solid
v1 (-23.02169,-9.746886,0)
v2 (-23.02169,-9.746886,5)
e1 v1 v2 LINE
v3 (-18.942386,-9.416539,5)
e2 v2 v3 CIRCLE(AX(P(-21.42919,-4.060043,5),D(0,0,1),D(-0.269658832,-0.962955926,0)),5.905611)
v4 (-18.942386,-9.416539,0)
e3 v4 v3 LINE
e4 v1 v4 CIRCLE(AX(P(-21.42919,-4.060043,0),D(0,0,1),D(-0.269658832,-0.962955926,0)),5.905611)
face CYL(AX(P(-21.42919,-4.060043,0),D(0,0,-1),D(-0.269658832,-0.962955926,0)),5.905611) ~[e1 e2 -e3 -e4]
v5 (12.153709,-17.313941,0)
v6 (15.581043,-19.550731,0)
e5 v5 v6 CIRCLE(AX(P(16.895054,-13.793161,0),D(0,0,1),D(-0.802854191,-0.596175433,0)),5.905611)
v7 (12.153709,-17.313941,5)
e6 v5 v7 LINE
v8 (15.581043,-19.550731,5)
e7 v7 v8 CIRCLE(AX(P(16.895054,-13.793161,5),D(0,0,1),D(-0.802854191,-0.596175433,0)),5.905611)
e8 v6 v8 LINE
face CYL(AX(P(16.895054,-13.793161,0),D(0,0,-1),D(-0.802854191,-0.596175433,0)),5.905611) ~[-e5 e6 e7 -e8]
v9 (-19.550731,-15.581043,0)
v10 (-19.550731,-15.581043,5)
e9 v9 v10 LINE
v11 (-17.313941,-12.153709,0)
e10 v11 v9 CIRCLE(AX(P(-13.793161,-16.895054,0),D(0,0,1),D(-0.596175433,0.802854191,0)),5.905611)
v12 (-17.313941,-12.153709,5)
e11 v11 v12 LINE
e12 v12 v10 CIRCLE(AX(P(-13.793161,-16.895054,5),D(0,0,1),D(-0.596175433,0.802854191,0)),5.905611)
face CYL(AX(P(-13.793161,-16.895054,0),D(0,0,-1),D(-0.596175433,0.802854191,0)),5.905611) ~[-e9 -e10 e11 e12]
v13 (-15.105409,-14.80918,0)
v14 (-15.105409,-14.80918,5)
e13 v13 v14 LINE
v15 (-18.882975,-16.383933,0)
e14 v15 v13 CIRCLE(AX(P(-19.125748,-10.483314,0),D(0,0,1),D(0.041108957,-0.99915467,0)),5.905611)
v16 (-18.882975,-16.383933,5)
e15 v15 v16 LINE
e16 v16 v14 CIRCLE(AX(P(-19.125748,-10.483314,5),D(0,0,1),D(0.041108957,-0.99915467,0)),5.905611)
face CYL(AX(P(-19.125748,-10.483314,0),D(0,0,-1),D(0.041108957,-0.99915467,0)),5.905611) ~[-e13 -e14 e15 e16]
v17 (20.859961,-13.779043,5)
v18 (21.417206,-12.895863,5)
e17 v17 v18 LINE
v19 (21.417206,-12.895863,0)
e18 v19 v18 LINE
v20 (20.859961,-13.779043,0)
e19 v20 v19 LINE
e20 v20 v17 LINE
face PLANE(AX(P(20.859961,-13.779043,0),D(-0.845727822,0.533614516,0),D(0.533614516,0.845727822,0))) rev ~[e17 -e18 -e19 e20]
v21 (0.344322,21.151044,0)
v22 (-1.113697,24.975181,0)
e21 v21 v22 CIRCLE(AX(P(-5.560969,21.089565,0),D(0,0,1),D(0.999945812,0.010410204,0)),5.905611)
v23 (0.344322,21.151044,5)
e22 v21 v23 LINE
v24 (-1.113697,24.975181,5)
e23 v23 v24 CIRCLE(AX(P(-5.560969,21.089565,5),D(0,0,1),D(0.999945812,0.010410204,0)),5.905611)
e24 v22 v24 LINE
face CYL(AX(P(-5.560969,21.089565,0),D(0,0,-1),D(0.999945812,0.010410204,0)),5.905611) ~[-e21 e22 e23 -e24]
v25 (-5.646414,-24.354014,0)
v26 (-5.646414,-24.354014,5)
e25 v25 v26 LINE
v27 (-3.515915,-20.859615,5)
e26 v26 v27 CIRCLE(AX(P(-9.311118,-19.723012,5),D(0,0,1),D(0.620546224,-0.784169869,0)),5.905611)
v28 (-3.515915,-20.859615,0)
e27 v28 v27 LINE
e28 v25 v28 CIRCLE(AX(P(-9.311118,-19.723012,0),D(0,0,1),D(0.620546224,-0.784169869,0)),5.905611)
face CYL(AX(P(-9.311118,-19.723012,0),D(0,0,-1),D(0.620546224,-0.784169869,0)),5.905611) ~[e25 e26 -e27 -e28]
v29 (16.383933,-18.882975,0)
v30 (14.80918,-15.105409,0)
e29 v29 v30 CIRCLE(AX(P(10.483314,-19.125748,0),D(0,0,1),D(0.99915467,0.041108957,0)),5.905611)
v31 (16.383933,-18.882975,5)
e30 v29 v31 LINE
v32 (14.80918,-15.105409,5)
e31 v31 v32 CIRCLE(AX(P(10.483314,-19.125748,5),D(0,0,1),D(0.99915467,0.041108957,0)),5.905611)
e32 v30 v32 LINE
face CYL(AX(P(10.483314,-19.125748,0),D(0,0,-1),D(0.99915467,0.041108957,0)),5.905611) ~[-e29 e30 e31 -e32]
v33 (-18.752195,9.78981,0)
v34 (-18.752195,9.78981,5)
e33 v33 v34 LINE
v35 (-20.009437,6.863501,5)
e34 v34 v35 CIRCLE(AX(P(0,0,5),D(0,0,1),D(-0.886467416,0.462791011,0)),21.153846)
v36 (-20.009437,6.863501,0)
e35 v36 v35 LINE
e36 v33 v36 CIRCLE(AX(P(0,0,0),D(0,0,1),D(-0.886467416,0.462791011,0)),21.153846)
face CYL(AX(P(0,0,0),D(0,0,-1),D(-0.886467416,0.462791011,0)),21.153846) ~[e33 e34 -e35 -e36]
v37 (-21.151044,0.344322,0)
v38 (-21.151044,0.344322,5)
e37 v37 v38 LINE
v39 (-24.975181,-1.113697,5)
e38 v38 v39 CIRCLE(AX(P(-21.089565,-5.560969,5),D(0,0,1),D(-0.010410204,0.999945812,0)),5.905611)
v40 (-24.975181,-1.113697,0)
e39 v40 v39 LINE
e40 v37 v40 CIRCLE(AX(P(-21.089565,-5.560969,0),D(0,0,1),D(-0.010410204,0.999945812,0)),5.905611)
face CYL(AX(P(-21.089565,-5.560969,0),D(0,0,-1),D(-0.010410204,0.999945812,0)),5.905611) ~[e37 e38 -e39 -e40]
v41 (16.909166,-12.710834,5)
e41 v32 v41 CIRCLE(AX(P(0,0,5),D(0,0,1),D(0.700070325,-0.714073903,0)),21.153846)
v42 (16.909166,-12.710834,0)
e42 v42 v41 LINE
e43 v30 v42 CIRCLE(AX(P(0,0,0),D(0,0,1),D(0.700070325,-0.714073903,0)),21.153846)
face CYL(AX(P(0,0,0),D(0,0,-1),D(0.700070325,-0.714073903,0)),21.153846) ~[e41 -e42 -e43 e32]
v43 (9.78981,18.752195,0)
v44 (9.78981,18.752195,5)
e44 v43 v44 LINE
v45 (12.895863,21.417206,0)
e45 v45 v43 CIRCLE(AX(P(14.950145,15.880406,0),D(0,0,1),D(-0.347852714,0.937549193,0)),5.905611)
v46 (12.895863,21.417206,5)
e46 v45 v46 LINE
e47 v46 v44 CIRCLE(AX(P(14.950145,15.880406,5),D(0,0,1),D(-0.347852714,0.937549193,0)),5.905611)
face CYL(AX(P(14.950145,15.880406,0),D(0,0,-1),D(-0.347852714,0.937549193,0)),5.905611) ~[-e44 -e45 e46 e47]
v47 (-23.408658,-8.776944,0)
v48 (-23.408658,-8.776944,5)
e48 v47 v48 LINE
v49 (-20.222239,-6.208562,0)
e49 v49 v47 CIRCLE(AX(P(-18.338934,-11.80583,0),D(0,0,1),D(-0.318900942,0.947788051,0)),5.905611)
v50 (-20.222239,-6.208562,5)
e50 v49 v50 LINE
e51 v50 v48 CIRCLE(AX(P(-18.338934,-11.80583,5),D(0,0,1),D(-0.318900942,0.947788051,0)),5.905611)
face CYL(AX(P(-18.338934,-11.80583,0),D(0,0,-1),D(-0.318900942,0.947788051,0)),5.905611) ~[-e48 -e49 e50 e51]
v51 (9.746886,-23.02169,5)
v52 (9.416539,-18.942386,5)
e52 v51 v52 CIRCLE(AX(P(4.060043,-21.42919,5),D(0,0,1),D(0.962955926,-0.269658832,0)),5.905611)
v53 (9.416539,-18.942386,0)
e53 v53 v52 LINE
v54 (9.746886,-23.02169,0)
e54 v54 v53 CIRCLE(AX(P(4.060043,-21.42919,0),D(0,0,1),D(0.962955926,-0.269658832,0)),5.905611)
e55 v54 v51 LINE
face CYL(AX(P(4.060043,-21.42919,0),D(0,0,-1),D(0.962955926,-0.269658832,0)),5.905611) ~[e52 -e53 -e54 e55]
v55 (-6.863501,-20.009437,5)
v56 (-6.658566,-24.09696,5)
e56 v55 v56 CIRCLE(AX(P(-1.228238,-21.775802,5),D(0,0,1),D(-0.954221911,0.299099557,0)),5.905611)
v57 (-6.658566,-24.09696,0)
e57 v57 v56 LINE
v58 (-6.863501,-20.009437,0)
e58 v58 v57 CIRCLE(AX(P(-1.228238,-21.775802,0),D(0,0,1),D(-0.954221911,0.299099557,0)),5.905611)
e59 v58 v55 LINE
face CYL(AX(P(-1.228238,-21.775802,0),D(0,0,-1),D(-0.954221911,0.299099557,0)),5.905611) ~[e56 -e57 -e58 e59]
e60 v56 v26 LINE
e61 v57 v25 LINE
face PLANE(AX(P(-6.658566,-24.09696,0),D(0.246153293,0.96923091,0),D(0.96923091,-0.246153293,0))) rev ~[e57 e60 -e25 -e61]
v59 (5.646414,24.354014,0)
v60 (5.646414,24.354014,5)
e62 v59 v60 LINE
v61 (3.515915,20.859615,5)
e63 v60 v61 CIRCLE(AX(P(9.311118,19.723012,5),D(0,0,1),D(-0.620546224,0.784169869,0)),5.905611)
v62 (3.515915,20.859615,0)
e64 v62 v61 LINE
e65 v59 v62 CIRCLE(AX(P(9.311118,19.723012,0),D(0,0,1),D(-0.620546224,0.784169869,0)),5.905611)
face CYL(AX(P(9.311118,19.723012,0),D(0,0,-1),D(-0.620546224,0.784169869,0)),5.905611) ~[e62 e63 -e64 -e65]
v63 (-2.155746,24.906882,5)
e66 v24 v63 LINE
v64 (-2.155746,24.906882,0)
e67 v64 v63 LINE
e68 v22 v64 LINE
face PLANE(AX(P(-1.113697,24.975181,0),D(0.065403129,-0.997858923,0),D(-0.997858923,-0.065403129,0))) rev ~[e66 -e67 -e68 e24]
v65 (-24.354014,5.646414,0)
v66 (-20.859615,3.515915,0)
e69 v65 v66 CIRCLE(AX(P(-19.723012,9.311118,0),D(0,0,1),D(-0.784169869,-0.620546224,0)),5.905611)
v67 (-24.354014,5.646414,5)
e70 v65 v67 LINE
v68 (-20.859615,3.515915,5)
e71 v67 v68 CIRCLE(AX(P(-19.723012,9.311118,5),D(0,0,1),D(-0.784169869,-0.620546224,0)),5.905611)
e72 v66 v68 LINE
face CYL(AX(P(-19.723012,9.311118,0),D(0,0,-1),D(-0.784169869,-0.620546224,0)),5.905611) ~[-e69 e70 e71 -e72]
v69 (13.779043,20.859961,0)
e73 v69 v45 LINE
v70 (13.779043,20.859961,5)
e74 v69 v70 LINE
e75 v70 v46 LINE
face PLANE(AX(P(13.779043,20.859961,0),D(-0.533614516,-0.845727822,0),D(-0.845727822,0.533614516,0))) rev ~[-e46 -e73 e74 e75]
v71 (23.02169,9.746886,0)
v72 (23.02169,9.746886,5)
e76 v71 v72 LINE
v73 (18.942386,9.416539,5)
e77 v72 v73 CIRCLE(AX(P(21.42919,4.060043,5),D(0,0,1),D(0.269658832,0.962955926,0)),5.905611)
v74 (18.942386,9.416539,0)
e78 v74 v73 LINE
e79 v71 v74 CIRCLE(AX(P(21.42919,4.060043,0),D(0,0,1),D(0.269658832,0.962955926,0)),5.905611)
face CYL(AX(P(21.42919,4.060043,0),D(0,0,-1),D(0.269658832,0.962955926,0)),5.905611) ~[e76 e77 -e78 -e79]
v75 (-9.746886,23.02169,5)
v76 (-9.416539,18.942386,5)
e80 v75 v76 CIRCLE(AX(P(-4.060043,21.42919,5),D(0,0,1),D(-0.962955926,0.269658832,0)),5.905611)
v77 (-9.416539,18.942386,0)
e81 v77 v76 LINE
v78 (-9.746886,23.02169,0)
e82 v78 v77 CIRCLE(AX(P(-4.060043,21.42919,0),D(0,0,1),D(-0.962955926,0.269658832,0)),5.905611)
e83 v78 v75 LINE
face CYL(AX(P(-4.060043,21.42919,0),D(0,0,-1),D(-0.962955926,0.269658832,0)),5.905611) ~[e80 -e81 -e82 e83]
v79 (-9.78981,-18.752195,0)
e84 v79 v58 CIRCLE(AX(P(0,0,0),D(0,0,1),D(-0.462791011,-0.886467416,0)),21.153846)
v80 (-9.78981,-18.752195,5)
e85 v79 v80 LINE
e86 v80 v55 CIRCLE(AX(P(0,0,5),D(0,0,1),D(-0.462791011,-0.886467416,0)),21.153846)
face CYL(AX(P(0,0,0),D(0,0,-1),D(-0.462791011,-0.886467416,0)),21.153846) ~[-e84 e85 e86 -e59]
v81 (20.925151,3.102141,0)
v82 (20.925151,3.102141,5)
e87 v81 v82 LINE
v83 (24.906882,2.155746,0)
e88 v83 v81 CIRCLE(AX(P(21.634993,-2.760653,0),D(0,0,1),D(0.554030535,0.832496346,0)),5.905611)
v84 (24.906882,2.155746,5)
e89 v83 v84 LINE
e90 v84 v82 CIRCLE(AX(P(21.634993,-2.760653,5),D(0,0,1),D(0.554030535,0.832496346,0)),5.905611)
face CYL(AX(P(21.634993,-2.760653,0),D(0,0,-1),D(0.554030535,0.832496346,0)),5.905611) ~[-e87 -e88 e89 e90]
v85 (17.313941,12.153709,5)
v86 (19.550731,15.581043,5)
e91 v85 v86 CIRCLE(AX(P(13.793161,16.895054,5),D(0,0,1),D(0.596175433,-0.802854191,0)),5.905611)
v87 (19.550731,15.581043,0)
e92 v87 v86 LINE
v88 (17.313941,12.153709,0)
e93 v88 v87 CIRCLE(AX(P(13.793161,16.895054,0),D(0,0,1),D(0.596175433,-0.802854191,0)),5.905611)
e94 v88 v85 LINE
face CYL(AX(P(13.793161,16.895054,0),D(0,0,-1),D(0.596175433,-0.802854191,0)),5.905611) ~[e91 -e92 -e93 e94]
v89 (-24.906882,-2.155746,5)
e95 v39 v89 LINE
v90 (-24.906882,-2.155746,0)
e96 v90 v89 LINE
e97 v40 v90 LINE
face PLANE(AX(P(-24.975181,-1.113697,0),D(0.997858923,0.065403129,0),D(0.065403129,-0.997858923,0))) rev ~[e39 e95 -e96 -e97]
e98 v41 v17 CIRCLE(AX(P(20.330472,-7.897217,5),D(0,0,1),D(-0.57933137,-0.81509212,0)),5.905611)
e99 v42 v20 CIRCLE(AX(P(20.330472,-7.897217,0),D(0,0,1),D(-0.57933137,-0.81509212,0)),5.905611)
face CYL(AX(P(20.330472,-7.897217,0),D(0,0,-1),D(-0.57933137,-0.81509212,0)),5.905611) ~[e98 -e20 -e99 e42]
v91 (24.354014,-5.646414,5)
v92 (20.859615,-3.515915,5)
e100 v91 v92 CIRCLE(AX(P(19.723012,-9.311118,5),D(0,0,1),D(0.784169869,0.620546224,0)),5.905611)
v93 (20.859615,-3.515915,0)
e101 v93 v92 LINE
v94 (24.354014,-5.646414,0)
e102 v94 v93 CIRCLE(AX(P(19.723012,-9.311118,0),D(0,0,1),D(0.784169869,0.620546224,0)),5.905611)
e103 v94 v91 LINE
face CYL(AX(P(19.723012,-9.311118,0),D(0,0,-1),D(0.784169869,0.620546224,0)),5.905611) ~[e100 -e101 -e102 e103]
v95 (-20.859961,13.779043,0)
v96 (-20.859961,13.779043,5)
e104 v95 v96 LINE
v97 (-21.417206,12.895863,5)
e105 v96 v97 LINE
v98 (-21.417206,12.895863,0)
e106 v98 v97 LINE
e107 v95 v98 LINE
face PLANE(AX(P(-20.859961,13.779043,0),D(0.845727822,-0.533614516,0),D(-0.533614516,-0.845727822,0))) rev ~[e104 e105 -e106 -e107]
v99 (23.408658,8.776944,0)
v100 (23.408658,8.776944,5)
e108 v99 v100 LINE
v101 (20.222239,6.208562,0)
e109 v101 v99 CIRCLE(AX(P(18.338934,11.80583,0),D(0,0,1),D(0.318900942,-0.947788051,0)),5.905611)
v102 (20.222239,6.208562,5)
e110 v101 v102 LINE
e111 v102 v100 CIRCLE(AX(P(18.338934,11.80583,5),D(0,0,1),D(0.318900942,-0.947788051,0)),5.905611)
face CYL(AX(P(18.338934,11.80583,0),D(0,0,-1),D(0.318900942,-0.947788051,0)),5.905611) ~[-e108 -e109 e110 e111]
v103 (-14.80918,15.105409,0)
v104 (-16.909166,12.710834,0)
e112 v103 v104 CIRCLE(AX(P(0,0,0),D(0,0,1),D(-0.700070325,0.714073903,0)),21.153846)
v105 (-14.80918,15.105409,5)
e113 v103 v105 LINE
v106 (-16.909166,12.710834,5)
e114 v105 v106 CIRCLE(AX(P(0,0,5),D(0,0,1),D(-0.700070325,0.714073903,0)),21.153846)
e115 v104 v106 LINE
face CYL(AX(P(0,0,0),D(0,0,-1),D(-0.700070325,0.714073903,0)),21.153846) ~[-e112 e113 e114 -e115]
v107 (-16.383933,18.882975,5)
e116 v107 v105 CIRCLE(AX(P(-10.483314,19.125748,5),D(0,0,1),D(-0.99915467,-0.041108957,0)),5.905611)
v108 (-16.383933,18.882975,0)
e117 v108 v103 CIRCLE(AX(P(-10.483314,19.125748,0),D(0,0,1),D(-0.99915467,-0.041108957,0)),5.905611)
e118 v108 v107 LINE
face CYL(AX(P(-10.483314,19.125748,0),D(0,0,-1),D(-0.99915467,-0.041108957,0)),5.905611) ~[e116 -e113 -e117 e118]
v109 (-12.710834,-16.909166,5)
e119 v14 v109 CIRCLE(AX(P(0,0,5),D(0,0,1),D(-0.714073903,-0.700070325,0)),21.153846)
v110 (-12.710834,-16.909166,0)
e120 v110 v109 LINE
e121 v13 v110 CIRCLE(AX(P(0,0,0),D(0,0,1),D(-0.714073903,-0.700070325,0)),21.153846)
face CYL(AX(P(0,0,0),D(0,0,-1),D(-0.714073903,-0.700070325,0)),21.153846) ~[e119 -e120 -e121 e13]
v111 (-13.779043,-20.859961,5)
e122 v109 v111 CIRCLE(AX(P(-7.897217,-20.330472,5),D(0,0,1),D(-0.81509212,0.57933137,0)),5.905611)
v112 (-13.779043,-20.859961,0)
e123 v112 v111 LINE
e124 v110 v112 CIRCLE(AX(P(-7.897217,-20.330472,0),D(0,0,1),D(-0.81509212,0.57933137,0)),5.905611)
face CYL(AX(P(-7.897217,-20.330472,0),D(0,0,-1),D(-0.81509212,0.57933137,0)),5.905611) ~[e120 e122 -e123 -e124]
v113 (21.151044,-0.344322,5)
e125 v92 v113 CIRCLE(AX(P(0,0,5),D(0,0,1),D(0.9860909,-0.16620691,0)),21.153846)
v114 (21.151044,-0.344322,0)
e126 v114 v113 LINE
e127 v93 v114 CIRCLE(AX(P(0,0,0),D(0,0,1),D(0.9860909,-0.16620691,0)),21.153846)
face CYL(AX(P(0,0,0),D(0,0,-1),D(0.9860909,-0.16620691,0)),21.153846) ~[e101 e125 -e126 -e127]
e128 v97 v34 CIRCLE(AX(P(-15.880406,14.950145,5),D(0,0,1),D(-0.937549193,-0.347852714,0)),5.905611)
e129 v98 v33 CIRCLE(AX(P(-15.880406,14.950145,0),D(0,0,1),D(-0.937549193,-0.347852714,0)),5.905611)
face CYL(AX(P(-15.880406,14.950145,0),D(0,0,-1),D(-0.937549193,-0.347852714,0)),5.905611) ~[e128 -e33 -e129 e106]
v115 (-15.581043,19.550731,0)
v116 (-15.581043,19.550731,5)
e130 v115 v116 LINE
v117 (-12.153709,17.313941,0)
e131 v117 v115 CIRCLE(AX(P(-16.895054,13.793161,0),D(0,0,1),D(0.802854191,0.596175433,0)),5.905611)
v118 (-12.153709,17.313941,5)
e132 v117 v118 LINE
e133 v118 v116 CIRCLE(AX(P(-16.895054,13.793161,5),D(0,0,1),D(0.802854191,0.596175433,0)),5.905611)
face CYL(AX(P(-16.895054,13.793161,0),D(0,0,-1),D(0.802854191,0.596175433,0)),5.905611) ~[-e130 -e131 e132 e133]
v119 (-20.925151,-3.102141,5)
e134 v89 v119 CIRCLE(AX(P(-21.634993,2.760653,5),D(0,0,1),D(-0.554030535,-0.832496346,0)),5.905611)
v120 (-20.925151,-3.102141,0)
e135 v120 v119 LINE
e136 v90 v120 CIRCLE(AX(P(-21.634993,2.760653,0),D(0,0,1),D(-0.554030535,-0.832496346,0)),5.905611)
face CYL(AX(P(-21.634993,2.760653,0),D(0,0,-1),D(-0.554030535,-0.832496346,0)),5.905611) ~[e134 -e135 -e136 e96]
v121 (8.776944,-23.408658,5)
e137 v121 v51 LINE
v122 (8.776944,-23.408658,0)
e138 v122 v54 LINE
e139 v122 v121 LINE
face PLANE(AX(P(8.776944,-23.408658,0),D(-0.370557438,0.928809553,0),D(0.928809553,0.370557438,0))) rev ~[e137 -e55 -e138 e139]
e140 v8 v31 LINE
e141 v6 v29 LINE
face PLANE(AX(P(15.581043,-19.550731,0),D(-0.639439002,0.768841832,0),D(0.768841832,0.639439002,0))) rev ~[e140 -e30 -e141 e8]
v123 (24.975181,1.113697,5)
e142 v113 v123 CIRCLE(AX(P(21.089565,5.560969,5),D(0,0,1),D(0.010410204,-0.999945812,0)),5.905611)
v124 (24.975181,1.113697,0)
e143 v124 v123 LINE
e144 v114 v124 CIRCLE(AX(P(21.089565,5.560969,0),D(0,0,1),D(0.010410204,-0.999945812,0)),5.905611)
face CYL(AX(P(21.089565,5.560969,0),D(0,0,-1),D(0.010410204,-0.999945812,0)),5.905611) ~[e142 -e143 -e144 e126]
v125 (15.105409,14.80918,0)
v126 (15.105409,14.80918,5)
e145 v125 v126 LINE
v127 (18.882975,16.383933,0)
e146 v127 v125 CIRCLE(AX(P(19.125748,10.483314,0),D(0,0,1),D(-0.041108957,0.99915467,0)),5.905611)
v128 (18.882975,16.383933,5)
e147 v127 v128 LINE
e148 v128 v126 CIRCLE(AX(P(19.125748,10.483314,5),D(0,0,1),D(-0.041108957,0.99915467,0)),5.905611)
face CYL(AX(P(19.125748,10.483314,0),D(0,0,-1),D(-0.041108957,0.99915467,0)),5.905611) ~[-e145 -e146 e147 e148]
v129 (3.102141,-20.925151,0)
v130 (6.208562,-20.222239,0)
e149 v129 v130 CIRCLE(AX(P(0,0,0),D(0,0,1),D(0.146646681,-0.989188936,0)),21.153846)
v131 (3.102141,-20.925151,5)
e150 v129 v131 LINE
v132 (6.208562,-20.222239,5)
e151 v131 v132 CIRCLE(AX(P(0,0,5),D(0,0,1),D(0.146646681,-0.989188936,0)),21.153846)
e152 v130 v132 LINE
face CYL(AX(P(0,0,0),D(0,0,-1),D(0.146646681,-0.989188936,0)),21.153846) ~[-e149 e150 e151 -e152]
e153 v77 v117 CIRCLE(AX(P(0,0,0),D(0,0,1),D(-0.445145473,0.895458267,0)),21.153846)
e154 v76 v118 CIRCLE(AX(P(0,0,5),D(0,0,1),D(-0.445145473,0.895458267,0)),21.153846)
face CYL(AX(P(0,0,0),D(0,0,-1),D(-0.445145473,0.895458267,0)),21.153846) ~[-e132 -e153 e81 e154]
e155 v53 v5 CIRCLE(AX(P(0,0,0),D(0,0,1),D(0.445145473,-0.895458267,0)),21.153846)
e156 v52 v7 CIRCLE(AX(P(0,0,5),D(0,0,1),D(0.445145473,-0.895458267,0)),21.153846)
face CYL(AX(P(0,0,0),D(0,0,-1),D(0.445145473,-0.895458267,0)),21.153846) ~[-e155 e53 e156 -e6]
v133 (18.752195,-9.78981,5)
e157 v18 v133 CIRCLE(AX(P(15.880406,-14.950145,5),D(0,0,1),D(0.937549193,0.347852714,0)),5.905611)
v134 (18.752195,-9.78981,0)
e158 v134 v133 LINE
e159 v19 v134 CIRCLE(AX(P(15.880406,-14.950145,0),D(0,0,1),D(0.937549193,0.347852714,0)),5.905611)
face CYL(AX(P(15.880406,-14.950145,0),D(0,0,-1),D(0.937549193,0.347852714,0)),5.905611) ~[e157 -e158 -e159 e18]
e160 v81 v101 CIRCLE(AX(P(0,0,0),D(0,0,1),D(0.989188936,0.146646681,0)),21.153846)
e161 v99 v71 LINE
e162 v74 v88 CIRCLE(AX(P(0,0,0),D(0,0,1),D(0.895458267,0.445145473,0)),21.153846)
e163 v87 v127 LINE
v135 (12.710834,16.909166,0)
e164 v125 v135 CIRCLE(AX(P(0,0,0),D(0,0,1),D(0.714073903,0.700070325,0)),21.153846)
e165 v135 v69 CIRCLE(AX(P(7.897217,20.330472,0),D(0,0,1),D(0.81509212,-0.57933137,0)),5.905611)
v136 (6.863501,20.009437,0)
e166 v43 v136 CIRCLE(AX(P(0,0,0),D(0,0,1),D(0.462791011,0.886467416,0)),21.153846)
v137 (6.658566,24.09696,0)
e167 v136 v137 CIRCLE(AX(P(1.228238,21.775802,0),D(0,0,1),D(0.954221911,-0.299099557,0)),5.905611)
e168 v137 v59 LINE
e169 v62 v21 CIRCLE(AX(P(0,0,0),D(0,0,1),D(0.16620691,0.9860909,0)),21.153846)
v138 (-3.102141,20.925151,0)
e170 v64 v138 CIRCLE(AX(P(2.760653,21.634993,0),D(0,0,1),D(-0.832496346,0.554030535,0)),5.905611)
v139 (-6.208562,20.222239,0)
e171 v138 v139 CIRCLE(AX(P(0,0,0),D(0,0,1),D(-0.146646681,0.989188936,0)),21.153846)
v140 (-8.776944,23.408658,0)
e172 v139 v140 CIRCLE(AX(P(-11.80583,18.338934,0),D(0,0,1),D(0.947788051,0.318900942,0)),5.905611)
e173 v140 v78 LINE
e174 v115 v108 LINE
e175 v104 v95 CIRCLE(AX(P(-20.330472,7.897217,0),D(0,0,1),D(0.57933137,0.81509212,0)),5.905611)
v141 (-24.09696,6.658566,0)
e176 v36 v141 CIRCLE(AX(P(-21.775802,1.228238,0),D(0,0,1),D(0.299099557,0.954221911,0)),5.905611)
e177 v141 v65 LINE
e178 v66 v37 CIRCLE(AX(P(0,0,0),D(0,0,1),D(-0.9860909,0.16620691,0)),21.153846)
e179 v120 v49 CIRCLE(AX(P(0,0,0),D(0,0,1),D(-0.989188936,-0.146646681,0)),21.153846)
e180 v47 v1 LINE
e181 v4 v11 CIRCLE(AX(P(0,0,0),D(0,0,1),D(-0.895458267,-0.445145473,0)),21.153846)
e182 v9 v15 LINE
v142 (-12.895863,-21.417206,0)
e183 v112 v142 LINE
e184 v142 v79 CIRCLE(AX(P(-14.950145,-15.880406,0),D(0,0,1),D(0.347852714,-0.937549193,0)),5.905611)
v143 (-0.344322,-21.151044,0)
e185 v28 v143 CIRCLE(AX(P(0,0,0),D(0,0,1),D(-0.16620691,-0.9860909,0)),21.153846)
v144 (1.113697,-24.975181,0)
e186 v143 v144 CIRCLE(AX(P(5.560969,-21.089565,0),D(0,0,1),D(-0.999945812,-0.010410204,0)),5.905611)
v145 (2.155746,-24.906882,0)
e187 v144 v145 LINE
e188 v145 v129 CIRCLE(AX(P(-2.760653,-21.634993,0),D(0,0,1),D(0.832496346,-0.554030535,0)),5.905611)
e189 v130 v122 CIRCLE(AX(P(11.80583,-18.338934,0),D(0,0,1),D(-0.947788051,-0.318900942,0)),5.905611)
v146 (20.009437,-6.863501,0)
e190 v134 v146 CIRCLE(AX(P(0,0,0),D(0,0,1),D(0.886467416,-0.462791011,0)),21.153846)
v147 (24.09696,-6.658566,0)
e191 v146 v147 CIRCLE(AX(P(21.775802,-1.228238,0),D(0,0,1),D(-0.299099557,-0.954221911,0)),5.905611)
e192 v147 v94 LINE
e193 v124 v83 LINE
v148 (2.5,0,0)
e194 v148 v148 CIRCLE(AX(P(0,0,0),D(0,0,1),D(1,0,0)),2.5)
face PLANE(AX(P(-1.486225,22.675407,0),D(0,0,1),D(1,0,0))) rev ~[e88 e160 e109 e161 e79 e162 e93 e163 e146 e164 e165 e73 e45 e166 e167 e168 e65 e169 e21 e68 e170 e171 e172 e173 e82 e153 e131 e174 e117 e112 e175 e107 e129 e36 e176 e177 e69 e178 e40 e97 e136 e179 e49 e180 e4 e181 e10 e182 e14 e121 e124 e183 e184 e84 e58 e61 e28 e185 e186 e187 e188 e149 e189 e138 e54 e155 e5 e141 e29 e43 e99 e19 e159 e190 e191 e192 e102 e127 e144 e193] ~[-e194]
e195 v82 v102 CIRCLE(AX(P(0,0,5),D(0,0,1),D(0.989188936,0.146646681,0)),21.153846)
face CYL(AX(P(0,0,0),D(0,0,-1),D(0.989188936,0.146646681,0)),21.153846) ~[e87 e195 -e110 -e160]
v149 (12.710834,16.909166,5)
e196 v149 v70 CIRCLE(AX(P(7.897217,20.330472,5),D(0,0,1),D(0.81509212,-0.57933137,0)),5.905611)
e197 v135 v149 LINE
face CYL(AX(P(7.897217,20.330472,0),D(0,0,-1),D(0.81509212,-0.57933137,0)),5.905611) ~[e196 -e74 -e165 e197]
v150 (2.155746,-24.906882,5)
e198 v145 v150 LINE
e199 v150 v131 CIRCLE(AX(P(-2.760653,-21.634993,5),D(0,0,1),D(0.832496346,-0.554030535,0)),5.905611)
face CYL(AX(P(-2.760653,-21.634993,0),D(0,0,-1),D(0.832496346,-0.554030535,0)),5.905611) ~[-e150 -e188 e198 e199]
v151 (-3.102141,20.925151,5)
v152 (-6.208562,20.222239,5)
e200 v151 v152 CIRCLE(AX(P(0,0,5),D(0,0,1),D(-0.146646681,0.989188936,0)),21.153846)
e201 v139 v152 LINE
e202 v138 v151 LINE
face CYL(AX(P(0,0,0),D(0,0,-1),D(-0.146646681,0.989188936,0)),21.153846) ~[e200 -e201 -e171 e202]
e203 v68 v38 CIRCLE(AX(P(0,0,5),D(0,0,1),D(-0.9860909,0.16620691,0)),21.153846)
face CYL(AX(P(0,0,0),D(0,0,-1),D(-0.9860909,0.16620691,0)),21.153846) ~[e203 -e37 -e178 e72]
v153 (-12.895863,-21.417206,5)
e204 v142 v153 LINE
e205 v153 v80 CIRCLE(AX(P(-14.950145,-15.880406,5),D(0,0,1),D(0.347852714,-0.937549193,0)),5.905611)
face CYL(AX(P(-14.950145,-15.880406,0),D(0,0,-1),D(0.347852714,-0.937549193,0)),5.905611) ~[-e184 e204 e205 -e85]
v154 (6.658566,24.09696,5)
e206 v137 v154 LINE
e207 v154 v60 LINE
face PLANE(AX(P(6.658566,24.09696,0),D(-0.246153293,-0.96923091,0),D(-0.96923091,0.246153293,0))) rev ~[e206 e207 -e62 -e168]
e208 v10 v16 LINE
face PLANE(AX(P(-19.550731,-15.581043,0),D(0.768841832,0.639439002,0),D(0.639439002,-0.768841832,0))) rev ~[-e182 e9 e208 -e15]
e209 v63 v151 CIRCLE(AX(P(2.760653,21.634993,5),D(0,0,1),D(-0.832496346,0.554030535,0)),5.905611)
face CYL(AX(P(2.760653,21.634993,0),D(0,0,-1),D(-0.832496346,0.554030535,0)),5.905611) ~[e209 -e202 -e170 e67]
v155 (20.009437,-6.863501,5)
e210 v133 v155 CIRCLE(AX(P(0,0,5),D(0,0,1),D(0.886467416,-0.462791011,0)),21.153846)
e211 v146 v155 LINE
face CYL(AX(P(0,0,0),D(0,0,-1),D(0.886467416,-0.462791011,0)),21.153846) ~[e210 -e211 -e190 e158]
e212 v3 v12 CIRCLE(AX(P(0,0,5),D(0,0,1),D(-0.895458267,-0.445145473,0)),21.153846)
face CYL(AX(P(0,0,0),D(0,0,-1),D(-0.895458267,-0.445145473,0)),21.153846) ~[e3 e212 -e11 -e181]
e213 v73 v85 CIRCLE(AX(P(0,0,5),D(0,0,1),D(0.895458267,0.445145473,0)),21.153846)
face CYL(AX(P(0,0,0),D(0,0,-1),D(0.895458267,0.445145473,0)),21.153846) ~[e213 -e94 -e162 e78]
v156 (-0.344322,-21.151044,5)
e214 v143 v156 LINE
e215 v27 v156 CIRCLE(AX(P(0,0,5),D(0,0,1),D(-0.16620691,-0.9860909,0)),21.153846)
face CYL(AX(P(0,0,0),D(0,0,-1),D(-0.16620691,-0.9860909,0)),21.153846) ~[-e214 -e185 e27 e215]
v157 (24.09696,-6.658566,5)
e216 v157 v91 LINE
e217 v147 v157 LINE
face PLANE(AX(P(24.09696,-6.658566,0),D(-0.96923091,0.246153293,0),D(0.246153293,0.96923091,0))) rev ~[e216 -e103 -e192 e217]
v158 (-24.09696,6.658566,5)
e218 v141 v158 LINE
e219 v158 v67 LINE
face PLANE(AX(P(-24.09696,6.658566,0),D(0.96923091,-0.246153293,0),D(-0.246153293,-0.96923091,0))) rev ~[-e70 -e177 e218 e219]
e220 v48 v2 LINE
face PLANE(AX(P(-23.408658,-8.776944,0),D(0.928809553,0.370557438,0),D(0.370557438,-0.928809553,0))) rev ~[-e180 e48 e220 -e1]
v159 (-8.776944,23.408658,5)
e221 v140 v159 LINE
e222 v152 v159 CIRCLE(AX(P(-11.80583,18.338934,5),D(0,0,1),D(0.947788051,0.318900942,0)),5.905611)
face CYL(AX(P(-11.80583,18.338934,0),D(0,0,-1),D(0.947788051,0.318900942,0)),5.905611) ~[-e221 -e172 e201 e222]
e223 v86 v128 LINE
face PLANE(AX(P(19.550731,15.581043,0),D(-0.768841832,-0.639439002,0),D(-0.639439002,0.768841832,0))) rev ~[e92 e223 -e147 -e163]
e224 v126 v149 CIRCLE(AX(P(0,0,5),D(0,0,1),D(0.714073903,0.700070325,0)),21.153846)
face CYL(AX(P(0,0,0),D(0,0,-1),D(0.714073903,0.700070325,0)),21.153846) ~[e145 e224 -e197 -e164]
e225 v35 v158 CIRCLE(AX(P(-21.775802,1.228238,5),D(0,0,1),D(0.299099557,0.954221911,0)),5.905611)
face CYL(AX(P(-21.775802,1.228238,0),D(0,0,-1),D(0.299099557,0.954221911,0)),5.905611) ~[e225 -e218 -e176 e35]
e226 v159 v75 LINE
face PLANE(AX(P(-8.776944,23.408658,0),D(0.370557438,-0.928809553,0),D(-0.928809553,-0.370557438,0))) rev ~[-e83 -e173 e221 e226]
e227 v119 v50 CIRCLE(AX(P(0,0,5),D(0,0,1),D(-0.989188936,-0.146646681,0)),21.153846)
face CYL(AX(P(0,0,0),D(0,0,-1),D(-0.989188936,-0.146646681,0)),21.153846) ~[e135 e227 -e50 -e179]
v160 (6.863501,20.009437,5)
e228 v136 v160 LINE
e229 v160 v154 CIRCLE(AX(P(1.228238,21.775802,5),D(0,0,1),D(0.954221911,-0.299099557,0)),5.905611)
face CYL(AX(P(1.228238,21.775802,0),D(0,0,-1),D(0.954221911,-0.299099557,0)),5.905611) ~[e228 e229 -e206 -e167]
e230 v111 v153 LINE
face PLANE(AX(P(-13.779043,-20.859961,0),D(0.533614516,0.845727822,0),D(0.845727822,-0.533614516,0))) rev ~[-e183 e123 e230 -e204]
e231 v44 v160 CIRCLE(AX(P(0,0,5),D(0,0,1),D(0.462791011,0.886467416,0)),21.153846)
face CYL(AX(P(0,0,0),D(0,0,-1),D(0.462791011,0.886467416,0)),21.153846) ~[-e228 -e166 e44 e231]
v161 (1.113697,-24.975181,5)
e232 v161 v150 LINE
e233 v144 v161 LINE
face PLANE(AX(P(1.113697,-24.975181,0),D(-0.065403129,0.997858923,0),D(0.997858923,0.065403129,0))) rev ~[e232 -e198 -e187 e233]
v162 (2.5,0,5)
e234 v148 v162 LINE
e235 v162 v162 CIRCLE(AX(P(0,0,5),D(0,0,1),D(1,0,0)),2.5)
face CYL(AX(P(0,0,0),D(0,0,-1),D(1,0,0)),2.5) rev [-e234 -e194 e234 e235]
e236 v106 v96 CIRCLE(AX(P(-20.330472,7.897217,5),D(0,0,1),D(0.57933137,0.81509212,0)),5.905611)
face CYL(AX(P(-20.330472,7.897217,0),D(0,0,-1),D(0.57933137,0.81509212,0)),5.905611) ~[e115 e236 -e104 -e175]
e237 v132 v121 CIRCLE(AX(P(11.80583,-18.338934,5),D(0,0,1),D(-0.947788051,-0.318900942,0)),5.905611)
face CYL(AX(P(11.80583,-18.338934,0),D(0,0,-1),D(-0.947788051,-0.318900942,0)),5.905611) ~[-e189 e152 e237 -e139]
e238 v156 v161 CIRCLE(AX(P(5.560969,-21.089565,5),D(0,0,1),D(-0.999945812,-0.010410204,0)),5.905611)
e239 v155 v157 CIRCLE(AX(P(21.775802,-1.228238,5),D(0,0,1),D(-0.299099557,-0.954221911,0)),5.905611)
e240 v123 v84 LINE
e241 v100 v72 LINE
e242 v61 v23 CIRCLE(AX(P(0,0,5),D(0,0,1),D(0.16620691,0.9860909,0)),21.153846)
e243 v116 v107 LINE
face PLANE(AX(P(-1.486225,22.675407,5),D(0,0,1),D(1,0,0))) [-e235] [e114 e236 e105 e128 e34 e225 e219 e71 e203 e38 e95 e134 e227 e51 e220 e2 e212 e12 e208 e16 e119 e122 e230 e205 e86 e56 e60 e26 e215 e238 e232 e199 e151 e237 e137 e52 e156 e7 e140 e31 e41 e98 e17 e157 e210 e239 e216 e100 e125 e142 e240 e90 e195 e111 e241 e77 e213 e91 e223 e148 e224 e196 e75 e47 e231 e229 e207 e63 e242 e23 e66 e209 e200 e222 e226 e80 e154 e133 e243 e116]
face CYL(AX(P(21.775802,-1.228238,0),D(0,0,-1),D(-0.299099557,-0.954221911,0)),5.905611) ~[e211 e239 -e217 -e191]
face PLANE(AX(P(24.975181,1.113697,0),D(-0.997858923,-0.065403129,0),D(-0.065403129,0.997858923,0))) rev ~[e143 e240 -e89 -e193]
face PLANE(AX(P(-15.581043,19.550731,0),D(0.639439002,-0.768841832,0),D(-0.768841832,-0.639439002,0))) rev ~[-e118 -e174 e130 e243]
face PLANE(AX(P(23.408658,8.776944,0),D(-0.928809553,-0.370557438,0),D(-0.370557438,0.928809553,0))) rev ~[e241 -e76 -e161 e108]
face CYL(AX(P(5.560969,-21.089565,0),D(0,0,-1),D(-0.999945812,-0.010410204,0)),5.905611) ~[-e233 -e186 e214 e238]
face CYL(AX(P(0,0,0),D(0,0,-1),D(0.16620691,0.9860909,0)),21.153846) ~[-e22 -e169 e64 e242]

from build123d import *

# Parameters (mm, degrees)
F1_R     = 2.5
F2_DEPTH = 5


with BuildPart() as f2:
    # F1 (on Top) → F2 (new body)
    with BuildSketch(Plane.XY):
        with BuildLine():
            ThreePointArc((-3.1021413291, 20.9251505676), (-1.3835277337, 21.1085541454), (0.3443218548, 21.1510436991))
            ThreePointArc((0.3443218548, 21.1510436991), (-0.0428266044, 23.1934529579), (-1.1136971825, 24.9751812523))
            Line((-1.1136971825, 24.9751812523), (-2.1557459601, 24.906881767))
            ThreePointArc((-2.1557459601, 24.906881767), (-2.9848928822, 23.0006197463), (-3.1021413291, 20.9251505676))
        make_face()
        with BuildLine():
            ThreePointArc((21.1510436991, -0.3443218548), (21.1531455286, -0.1721666296), (21.1538461538, 0))
            ThreePointArc((21.1538461538, 0), (21.0965947839, 1.5552799183), (20.9251505676, 3.1021413291))
            ThreePointArc((20.9251505676, 3.1021413291), (20.6322413954, 4.668599587), (20.2222392411, 6.2085624081))
            ThreePointArc((20.2222392411, 6.2085624081), (19.6478943877, 7.8387150242), (18.9423864121, 9.4165388608))
            ThreePointArc((18.9423864121, 9.4165388608), (18.1797510125, 10.8158152824), (17.3139411096, 12.1537093248))
            ThreePointArc((17.3139411096, 12.1537093248), (16.2639618323, 13.5265942727), (15.1054094952, 14.8091799598))
            ThreePointArc((15.1054094952, 14.8091799598), (13.9476999348, 15.9043036197), (12.710833789, 16.909166493))
            ThreePointArc((12.710833789, 16.909166493), (11.2879993751, 17.8903962284), (9.7898098514, 18.7521953428))
            ThreePointArc((9.7898098514, 18.7521953428), (8.3503508081, 19.435967907), (6.8635014955, 20.0094366318))
            ThreePointArc((6.8635014955, 20.0094366318), (5.207088891, 20.5029615515), (3.5159154097, 20.8596151914))
            ThreePointArc((3.5159154097, 20.8596151914), (1.935611164, 21.0651042372), (0.3443218548, 21.1510436991))
            ThreePointArc((0.3443218548, 21.1510436991), (-1.3835277337, 21.1085541454), (-3.1021413291, 20.9251505676))
            ThreePointArc((-3.1021413291, 20.9251505676), (-4.668599587, 20.6322413954), (-6.2085624081, 20.2222392411))
            ThreePointArc((-6.2085624081, 20.2222392411), (-7.8387150242, 19.6478943877), (-9.4165388608, 18.9423864121))
            ThreePointArc((-9.4165388608, 18.9423864121), (-10.8158152824, 18.1797510125), (-12.1537093248, 17.3139411096))
            ThreePointArc((-12.1537093248, 17.3139411096), (-13.5265942727, 16.2639618323), (-14.8091799598, 15.1054094952))
            ThreePointArc((-14.8091799598, 15.1054094952), (-15.9043036197, 13.9476999348), (-16.909166493, 12.710833789))
            ThreePointArc((-16.909166493, 12.710833789), (-17.8903962284, 11.2879993751), (-18.7521953428, 9.7898098514))
            ThreePointArc((-18.7521953428, 9.7898098514), (-19.435967907, 8.3503508081), (-20.0094366318, 6.8635014955))
            ThreePointArc((-20.0094366318, 6.8635014955), (-20.5029615515, 5.207088891), (-20.8596151914, 3.5159154097))
            ThreePointArc((-20.8596151914, 3.5159154097), (-21.0651042372, 1.935611164), (-21.1510436991, 0.3443218548))
            ThreePointArc((-21.1510436991, 0.3443218548), (-21.1085541454, -1.3835277337), (-20.9251505676, -3.1021413291))
            ThreePointArc((-20.9251505676, -3.1021413291), (-20.6322413954, -4.668599587), (-20.2222392411, -6.2085624081))
            ThreePointArc((-20.2222392411, -6.2085624081), (-19.6478943877, -7.8387150242), (-18.9423864121, -9.4165388608))
            ThreePointArc((-18.9423864121, -9.4165388608), (-18.1797510125, -10.8158152824), (-17.3139411096, -12.1537093248))
            ThreePointArc((-17.3139411096, -12.1537093248), (-16.2639618323, -13.5265942727), (-15.1054094952, -14.8091799598))
            ThreePointArc((-15.1054094952, -14.8091799598), (-13.9476999348, -15.9043036197), (-12.710833789, -16.909166493))
            ThreePointArc((-12.710833789, -16.909166493), (-11.2879993751, -17.8903962284), (-9.7898098514, -18.7521953428))
            ThreePointArc((-9.7898098514, -18.7521953428), (-8.3503508081, -19.435967907), (-6.8635014955, -20.0094366318))
            ThreePointArc((-6.8635014955, -20.0094366318), (-5.207088891, -20.5029615515), (-3.5159154097, -20.8596151914))
            ThreePointArc((-3.5159154097, -20.8596151914), (-1.935611164, -21.0651042372), (-0.3443218548, -21.1510436991))
            ThreePointArc((-0.3443218548, -21.1510436991), (1.3835277337, -21.1085541454), (3.1021413291, -20.9251505676))
            ThreePointArc((3.1021413291, -20.9251505676), (4.668599587, -20.6322413954), (6.2085624081, -20.2222392411))
            ThreePointArc((6.2085624081, -20.2222392411), (7.8387150242, -19.6478943877), (9.4165388608, -18.9423864121))
            ThreePointArc((9.4165388608, -18.9423864121), (10.8158152824, -18.1797510125), (12.1537093248, -17.3139411096))
            ThreePointArc((12.1537093248, -17.3139411096), (13.5265942727, -16.2639618323), (14.8091799598, -15.1054094952))
            ThreePointArc((14.8091799598, -15.1054094952), (15.9043036197, -13.9476999348), (16.909166493, -12.710833789))
            ThreePointArc((16.909166493, -12.710833789), (17.8903962284, -11.2879993751), (18.7521953428, -9.7898098514))
            ThreePointArc((18.7521953428, -9.7898098514), (19.435967907, -8.3503508081), (20.0094366318, -6.8635014955))
            ThreePointArc((20.0094366318, -6.8635014955), (20.5029615515, -5.207088891), (20.8596151914, -3.5159154097))
            ThreePointArc((20.8596151914, -3.5159154097), (21.0651042372, -1.935611164), (21.1510436991, -0.3443218548))
        make_face()
        Circle(F1_R, mode=Mode.SUBTRACT)
        with BuildLine():
            ThreePointArc((-9.4165388608, 18.9423864121), (-7.8387150242, 19.6478943877), (-6.2085624081, 20.2222392411))
            ThreePointArc((-6.2085624081, 20.2222392411), (-7.2079016434, 22.0450504225), (-8.7769444072, 23.4086575197))
            Line((-8.7769444072, 23.4086575197), (-9.7468859857, 23.0216900679))
            ThreePointArc((-9.7468859857, 23.0216900679), (-9.9463842088, 20.9525066615), (-9.4165388608, 18.9423864121))
        make_face()
        with BuildLine():
            ThreePointArc((-14.8091799598, 15.1054094952), (-13.5265942727, 16.2639618323), (-12.1537093248, 17.3139411096))
            ThreePointArc((-12.1537093248, 17.3139411096), (-13.6674170492, 18.7387247548), (-15.5810431607, 19.5507312913))
            Line((-15.5810431607, 19.5507312913), (-16.3839329005, 18.8829749434))
            ThreePointArc((-16.3839329005, 18.8829749434), (-15.9342541485, 16.8534162401), (-14.8091799598, 15.1054094952))
        make_face()
        with BuildLine():
            ThreePointArc((-18.7521953428, 9.7898098514), (-17.8903962284, 11.2879993751), (-16.909166493, 12.710833789))
            ThreePointArc((-16.909166493, 12.710833789), (-18.7890704477, 13.5981221477), (-20.8599608501, 13.7790432662))
            Line((-20.8599608501, 13.7790432662), (-21.4172063094, 12.895862666))
            ThreePointArc((-21.4172063094, 12.895862666), (-20.3623682717, 11.1045960124), (-18.7521953428, 9.7898098514))
        make_face()
        with BuildLine():
            ThreePointArc((-20.8596151914, 3.5159154097), (-20.5029615515, 5.207088891), (-20.0094366318, 6.8635014955))
            ThreePointArc((-20.0094366318, 6.8635014955), (-22.0715187196, 7.1264406011), (-24.0969602317, 6.6585664819))
            Line((-24.0969602317, 6.6585664819), (-24.3540143423, 5.6464135001))
            ThreePointArc((-24.3540143423, 5.6464135001), (-22.7972719155, 4.2687805567), (-20.8596151914, 3.5159154097))
        make_face()
        with BuildLine():
            ThreePointArc((-20.9251505676, -3.1021413291), (-21.1085541454, -1.3835277337), (-21.1510436991, 0.3443218548))
            ThreePointArc((-21.1510436991, 0.3443218548), (-23.1934529579, -0.0428266044), (-24.9751812523, -1.1136971825))
            Line((-24.9751812523, -1.1136971825), (-24.906881767, -2.1557459601))
            ThreePointArc((-24.906881767, -2.1557459601), (-23.0006197463, -2.9848928822), (-20.9251505676, -3.1021413291))
        make_face()
        with BuildLine():
            ThreePointArc((-23.0216900679, -9.7468859857), (-20.9525066615, -9.9463842088), (-18.9423864121, -9.4165388608))
            ThreePointArc((-18.9423864121, -9.4165388608), (-19.6478943877, -7.8387150242), (-20.2222392411, -6.2085624081))
            ThreePointArc((-20.2222392411, -6.2085624081), (-22.0450504225, -7.2079016434), (-23.4086575197, -8.7769444072))
            Line((-23.4086575197, -8.7769444072), (-23.0216900679, -9.7468859857))
        make_face()
        with BuildLine():
            ThreePointArc((-18.8829749434, -16.3839329005), (-16.8534162401, -15.9342541485), (-15.1054094952, -14.8091799598))
            ThreePointArc((-15.1054094952, -14.8091799598), (-16.2639618323, -13.5265942727), (-17.3139411096, -12.1537093248))
            ThreePointArc((-17.3139411096, -12.1537093248), (-18.7387247548, -13.6674170492), (-19.5507312913, -15.5810431607))
            Line((-19.5507312913, -15.5810431607), (-18.8829749434, -16.3839329005))
        make_face()
        with BuildLine():
            ThreePointArc((-12.895862666, -21.4172063094), (-11.1045960124, -20.3623682717), (-9.7898098514, -18.7521953428))
            ThreePointArc((-9.7898098514, -18.7521953428), (-11.2879993751, -17.8903962284), (-12.710833789, -16.909166493))
            ThreePointArc((-12.710833789, -16.909166493), (-13.5981221477, -18.7890704477), (-13.7790432662, -20.8599608501))
            Line((-13.7790432662, -20.8599608501), (-12.895862666, -21.4172063094))
        make_face()
        with BuildLine():
            ThreePointArc((-5.6464135001, -24.3540143423), (-4.2687805567, -22.7972719155), (-3.5159154097, -20.8596151914))
            ThreePointArc((-3.5159154097, -20.8596151914), (-5.207088891, -20.5029615515), (-6.8635014955, -20.0094366318))
            ThreePointArc((-6.8635014955, -20.0094366318), (-7.1264406011, -22.0715187196), (-6.6585664819, -24.0969602317))
            Line((-6.6585664819, -24.0969602317), (-5.6464135001, -24.3540143423))
        make_face()
        with BuildLine():
            ThreePointArc((2.1557459601, -24.906881767), (2.9848928822, -23.0006197463), (3.1021413291, -20.9251505676))
            ThreePointArc((3.1021413291, -20.9251505676), (1.3835277337, -21.1085541454), (-0.3443218548, -21.1510436991))
            ThreePointArc((-0.3443218548, -21.1510436991), (0.0428266044, -23.1934529579), (1.1136971825, -24.9751812523))
            Line((1.1136971825, -24.9751812523), (2.1557459601, -24.906881767))
        make_face()
        with BuildLine():
            ThreePointArc((9.7468859857, -23.0216900679), (9.9463842088, -20.9525066615), (9.4165388608, -18.9423864121))
            ThreePointArc((9.4165388608, -18.9423864121), (7.8387150242, -19.6478943877), (6.2085624081, -20.2222392411))
            ThreePointArc((6.2085624081, -20.2222392411), (7.2079016434, -22.0450504225), (8.7769444072, -23.4086575197))
            Line((8.7769444072, -23.4086575197), (9.7468859857, -23.0216900679))
        make_face()
        with BuildLine():
            ThreePointArc((16.3839329005, -18.8829749434), (15.9342541485, -16.8534162401), (14.8091799598, -15.1054094952))
            ThreePointArc((14.8091799598, -15.1054094952), (13.5265942727, -16.2639618323), (12.1537093248, -17.3139411096))
            ThreePointArc((12.1537093248, -17.3139411096), (13.6674170492, -18.7387247548), (15.5810431607, -19.5507312913))
            Line((15.5810431607, -19.5507312913), (16.3839329005, -18.8829749434))
        make_face()
        with BuildLine():
            ThreePointArc((21.4172063094, -12.895862666), (20.3623682717, -11.1045960124), (18.7521953428, -9.7898098514))
            ThreePointArc((18.7521953428, -9.7898098514), (17.8903962284, -11.2879993751), (16.909166493, -12.710833789))
            ThreePointArc((16.909166493, -12.710833789), (18.7890704477, -13.5981221477), (20.8599608501, -13.7790432662))
            Line((20.8599608501, -13.7790432662), (21.4172063094, -12.895862666))
        make_face()
        with BuildLine():
            ThreePointArc((24.3540143423, -5.6464135001), (22.7972719155, -4.2687805567), (20.8596151914, -3.5159154097))
            ThreePointArc((20.8596151914, -3.5159154097), (20.5029615515, -5.207088891), (20.0094366318, -6.8635014955))
            ThreePointArc((20.0094366318, -6.8635014955), (22.0715187196, -7.1264406011), (24.0969602317, -6.6585664819))
            Line((24.0969602317, -6.6585664819), (24.3540143423, -5.6464135001))
        make_face()
        with BuildLine():
            ThreePointArc((20.9251505676, 3.1021413291), (21.0965947839, 1.5552799183), (21.1538461538, 0))
            ThreePointArc((21.1538461538, 0), (21.1531455286, -0.1721666296), (21.1510436991, -0.3443218548))
            ThreePointArc((21.1510436991, -0.3443218548), (23.1934529579, 0.0428266044), (24.9751812523, 1.1136971825))
            Line((24.9751812523, 1.1136971825), (24.906881767, 2.1557459601))
            ThreePointArc((24.906881767, 2.1557459601), (23.0006197463, 2.9848928822), (20.9251505676, 3.1021413291))
        make_face()
        with BuildLine():
            ThreePointArc((18.9423864121, 9.4165388608), (19.6478943877, 7.8387150242), (20.2222392411, 6.2085624081))
            ThreePointArc((20.2222392411, 6.2085624081), (22.0450504225, 7.2079016434), (23.4086575197, 8.7769444072))
            Line((23.4086575197, 8.7769444072), (23.0216900679, 9.7468859857))
            ThreePointArc((23.0216900679, 9.7468859857), (20.9525066615, 9.9463842088), (18.9423864121, 9.4165388608))
        make_face()
        with BuildLine():
            ThreePointArc((15.1054094952, 14.8091799598), (16.2639618323, 13.5265942727), (17.3139411096, 12.1537093248))
            ThreePointArc((17.3139411096, 12.1537093248), (18.7387247548, 13.6674170492), (19.5507312913, 15.5810431607))
            Line((19.5507312913, 15.5810431607), (18.8829749434, 16.3839329005))
            ThreePointArc((18.8829749434, 16.3839329005), (16.8534162401, 15.9342541485), (15.1054094952, 14.8091799598))
        make_face()
        with BuildLine():
            ThreePointArc((9.7898098514, 18.7521953428), (11.2879993751, 17.8903962284), (12.710833789, 16.909166493))
            ThreePointArc((12.710833789, 16.909166493), (13.5981221477, 18.7890704477), (13.7790432662, 20.8599608501))
            Line((13.7790432662, 20.8599608501), (12.895862666, 21.4172063094))
            ThreePointArc((12.895862666, 21.4172063094), (11.1045960124, 20.3623682717), (9.7898098514, 18.7521953428))
        make_face()
        with BuildLine():
            ThreePointArc((3.5159154097, 20.8596151914), (5.207088891, 20.5029615515), (6.8635014955, 20.0094366318))
            ThreePointArc((6.8635014955, 20.0094366318), (7.1264406011, 22.0715187196), (6.6585664819, 24.0969602317))
            Line((6.6585664819, 24.0969602317), (5.6464135001, 24.3540143423))
            ThreePointArc((5.6464135001, 24.3540143423), (4.2687805567, 22.7972719155), (3.5159154097, 20.8596151914))
        make_face()
    extrude(amount=F2_DEPTH)


solid = f2.part
